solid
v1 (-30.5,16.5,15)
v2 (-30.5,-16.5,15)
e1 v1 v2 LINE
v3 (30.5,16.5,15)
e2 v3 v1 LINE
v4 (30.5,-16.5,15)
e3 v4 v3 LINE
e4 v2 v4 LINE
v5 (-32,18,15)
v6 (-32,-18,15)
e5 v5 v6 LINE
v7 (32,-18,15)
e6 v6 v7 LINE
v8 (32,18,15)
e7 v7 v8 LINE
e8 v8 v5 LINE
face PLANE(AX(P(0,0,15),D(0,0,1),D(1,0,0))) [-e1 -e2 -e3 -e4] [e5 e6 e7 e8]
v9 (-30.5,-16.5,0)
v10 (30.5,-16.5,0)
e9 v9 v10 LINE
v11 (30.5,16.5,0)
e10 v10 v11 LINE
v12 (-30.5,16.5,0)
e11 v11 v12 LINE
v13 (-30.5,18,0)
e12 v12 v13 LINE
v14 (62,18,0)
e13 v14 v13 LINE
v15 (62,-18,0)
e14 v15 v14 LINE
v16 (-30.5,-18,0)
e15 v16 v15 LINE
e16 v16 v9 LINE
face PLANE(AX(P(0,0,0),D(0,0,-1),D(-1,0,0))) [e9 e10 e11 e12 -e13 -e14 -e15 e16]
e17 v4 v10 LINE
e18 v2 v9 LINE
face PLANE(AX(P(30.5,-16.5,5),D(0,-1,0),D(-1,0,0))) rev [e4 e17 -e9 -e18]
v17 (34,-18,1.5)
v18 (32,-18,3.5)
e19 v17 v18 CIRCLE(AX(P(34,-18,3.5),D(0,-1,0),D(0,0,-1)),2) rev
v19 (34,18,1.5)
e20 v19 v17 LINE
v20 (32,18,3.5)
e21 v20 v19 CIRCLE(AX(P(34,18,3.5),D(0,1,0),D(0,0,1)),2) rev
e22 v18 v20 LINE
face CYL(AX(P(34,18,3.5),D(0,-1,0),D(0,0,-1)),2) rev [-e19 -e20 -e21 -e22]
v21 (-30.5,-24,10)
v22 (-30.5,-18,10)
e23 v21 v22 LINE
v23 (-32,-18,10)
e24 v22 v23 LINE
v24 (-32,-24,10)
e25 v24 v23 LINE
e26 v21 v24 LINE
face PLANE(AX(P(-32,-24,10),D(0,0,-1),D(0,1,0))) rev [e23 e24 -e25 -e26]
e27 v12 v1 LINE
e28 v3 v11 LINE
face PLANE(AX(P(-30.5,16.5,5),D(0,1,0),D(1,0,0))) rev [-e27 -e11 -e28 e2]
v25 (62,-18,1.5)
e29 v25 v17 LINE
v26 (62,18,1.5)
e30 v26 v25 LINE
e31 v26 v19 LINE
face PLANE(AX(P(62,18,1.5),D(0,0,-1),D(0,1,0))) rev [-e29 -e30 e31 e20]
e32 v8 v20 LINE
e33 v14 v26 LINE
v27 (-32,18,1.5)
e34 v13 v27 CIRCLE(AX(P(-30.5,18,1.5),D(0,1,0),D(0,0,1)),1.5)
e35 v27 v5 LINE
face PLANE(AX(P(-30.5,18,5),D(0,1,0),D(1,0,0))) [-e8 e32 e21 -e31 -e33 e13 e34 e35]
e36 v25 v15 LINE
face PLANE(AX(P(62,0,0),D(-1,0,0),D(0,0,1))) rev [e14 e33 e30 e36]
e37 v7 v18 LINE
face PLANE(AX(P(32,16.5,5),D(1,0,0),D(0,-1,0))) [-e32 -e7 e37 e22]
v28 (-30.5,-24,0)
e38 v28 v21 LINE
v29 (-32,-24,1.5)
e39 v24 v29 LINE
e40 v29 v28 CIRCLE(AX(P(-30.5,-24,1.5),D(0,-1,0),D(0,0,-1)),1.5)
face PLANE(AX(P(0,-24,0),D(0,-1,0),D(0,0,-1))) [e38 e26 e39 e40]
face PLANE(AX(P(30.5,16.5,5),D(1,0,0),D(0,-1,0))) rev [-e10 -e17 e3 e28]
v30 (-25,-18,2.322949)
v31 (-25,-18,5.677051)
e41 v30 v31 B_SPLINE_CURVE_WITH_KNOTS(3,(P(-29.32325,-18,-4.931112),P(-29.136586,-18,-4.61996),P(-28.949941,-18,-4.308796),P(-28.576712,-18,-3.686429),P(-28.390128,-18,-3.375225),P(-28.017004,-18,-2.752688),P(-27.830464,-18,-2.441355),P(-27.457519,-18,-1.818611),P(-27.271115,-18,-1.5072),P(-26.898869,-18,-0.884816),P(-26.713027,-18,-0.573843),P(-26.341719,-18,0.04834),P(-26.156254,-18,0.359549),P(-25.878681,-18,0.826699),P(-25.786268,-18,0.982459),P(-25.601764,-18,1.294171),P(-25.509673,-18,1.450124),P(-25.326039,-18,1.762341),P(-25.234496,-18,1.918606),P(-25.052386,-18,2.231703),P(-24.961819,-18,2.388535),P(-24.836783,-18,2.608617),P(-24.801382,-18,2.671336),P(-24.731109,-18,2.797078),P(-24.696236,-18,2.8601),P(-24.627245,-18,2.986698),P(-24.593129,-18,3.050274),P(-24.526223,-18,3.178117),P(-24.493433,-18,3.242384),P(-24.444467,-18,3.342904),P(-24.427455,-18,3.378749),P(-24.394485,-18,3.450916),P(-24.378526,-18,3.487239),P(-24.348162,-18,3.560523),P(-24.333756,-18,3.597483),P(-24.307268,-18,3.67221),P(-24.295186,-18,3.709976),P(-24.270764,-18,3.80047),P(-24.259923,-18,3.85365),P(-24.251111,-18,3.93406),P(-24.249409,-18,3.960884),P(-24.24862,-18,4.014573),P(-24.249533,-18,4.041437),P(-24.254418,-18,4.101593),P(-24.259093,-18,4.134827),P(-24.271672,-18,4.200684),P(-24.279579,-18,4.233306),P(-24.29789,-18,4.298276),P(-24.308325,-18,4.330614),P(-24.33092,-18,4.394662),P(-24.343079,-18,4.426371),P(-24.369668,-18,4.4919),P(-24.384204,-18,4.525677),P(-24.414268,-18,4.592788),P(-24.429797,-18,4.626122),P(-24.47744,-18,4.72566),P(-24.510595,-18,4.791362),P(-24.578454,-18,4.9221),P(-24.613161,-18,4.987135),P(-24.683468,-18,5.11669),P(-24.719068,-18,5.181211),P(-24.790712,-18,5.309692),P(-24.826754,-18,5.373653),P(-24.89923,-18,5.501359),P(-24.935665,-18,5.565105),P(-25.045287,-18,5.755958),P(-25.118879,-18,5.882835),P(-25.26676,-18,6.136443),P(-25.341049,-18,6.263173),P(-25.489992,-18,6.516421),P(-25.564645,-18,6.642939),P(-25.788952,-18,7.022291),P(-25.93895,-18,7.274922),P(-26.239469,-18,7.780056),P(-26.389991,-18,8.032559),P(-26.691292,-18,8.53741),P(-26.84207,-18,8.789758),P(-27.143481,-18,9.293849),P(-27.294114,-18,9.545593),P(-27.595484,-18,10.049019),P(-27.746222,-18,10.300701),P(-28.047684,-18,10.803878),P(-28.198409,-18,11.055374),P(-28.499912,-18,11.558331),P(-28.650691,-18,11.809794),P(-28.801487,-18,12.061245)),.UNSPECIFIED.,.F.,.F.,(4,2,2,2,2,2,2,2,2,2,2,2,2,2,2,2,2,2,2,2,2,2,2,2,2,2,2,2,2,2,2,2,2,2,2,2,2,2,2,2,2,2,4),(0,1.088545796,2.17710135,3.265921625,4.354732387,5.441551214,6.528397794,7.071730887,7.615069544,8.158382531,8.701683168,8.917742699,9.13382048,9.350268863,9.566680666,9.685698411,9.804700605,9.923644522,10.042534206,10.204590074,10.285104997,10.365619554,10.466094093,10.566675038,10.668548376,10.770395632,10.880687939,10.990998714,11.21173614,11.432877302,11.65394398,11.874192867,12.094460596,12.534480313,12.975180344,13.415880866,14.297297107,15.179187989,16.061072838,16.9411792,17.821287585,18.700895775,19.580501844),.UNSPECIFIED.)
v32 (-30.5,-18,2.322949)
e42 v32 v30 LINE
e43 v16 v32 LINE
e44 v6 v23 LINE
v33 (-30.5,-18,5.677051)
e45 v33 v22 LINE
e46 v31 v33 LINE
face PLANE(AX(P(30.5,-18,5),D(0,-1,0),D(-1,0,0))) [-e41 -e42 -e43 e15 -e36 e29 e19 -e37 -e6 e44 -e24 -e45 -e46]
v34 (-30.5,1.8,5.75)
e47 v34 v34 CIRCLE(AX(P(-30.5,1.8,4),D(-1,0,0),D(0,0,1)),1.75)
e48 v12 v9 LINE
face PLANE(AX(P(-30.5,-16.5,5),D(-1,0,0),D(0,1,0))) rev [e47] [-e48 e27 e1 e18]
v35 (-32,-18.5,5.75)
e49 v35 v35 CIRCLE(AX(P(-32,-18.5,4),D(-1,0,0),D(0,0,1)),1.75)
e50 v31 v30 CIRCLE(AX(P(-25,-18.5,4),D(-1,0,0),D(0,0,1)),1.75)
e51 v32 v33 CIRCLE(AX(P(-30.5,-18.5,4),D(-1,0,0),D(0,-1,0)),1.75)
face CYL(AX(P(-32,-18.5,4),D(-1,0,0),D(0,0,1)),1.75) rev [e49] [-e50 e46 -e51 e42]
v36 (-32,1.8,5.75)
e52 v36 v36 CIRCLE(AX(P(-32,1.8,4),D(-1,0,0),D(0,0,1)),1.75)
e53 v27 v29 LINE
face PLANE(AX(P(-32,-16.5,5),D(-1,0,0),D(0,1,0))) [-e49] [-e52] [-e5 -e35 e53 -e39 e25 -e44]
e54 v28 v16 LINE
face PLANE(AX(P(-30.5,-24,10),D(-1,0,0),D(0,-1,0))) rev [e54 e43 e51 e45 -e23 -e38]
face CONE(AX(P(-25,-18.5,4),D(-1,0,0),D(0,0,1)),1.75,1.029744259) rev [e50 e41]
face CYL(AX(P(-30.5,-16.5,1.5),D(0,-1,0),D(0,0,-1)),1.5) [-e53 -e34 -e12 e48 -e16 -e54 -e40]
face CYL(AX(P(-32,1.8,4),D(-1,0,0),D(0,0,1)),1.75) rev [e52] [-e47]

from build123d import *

# Parameters (mm, degrees)
LOFT_THIN1_OUTLINE_W      = 64
LOFT_THIN1_OUTLINE_H      = 36
LOFT_THIN1_OUTLINE_W_2    = 61
LOFT_THIN1_OUTLINE_H_2    = 33
LOFT_THIN1_DEPTH          = 5
SKETCH3_4_W               = 64
SKETCH3_4_H               = 36
SKETCH3_4_W_2             = 61
SKETCH3_4_H_2             = 33
EXTRUDE_THIN1_DEPTH       = 10
SKETCH8_W                 = 1.5
SKETCH8_H                 = 10
BOSS_EXTRUDE3_DEPTH       = 6
SKETCH7_W                 = 1.5
SKETCH7_H                 = 36
BOSS_EXTRUDE2_DEPTH       = 30
F_3_0MM_DOWEL_HOLE1_D     = 3.5
F_3_0MM_DOWEL_HOLE1_DEPTH = 7
F_3_0MM_DOWEL_HOLE1_TIP   = 1.051506083
FILLET1_R                 = 2
FILLET2_START             = -25
FILLET2_DEPTH             = 44


with BuildPart() as part:
    # Loft-Thin1: read off the stored shape, not the designer's step
    # Loft-Thin1 outline → Loft-Thin1 (new body)
    with BuildSketch(Plane.XY):
        Rectangle(LOFT_THIN1_OUTLINE_W, LOFT_THIN1_OUTLINE_H)
        Rectangle(LOFT_THIN1_OUTLINE_W_2, LOFT_THIN1_OUTLINE_H_2, mode=Mode.SUBTRACT)
    extrude(amount=LOFT_THIN1_DEPTH)

    # Sketch3<4> → Extrude-Thin1 (add)
    with BuildSketch(Plane.XY.offset(5)):
        Rectangle(SKETCH3_4_W, SKETCH3_4_H)
        Rectangle(SKETCH3_4_W_2, SKETCH3_4_H_2, mode=Mode.SUBTRACT)
    extrude(amount=EXTRUDE_THIN1_DEPTH)

    # Sketch8 → Boss-Extrude3 (add)
    with BuildSketch(Plane.XZ.offset(18)):
        with Locations((-31.25, 5)):
            Rectangle(SKETCH8_W, SKETCH8_H)
    extrude(amount=BOSS_EXTRUDE3_DEPTH)

    # Sketch7 → Boss-Extrude2 (add)
    with BuildSketch(Plane(origin=(32, 0, 0), x_dir=(0, 0, -1), z_dir=(1, 0, 0))):
        with Locations((-0.75, 0)):
            Rectangle(SKETCH7_W, SKETCH7_H)
    extrude(amount=BOSS_EXTRUDE2_DEPTH)

    # Ø3.0mm Dowel Hole1
    with Locations(Plane.ZY.offset(32)):
        with Locations((4, 1.8), (4, -18.5)):
            Hole(F_3_0MM_DOWEL_HOLE1_D / 2, depth=F_3_0MM_DOWEL_HOLE1_DEPTH)
            with Locations((0, 0, -(F_3_0MM_DOWEL_HOLE1_DEPTH + F_3_0MM_DOWEL_HOLE1_TIP / 2))):  # 118° drill point
                Cone(0, F_3_0MM_DOWEL_HOLE1_D / 2, F_3_0MM_DOWEL_HOLE1_TIP, mode=Mode.SUBTRACT)

    # Fillet1
    fillet1_edges = [part.edges().sort_by_distance(p)[0] for p in [
        (32, 0, 1.5),
    ]]
    fillet(fillet1_edges, radius=FILLET1_R)

    # Fillet2: read off the stored shape, not the designer's step
    # Fillet2 outline → Fillet2 (cut)
    with BuildSketch(Plane(origin=(0, 0, 0), x_dir=(1, 0, 0), z_dir=(0, 1, 0)).offset(FILLET2_START)):
        with BuildLine():
            Line((-32, 0), (-32, -1.5))
            ThreePointArc((-32, -1.5), (-31.560660172, -0.439339828), (-30.5, 0))
            Line((-30.5, 0), (-32, 0))
        make_face()
    extrude(amount=FILLET2_DEPTH, mode=Mode.SUBTRACT)


solid = part.part
